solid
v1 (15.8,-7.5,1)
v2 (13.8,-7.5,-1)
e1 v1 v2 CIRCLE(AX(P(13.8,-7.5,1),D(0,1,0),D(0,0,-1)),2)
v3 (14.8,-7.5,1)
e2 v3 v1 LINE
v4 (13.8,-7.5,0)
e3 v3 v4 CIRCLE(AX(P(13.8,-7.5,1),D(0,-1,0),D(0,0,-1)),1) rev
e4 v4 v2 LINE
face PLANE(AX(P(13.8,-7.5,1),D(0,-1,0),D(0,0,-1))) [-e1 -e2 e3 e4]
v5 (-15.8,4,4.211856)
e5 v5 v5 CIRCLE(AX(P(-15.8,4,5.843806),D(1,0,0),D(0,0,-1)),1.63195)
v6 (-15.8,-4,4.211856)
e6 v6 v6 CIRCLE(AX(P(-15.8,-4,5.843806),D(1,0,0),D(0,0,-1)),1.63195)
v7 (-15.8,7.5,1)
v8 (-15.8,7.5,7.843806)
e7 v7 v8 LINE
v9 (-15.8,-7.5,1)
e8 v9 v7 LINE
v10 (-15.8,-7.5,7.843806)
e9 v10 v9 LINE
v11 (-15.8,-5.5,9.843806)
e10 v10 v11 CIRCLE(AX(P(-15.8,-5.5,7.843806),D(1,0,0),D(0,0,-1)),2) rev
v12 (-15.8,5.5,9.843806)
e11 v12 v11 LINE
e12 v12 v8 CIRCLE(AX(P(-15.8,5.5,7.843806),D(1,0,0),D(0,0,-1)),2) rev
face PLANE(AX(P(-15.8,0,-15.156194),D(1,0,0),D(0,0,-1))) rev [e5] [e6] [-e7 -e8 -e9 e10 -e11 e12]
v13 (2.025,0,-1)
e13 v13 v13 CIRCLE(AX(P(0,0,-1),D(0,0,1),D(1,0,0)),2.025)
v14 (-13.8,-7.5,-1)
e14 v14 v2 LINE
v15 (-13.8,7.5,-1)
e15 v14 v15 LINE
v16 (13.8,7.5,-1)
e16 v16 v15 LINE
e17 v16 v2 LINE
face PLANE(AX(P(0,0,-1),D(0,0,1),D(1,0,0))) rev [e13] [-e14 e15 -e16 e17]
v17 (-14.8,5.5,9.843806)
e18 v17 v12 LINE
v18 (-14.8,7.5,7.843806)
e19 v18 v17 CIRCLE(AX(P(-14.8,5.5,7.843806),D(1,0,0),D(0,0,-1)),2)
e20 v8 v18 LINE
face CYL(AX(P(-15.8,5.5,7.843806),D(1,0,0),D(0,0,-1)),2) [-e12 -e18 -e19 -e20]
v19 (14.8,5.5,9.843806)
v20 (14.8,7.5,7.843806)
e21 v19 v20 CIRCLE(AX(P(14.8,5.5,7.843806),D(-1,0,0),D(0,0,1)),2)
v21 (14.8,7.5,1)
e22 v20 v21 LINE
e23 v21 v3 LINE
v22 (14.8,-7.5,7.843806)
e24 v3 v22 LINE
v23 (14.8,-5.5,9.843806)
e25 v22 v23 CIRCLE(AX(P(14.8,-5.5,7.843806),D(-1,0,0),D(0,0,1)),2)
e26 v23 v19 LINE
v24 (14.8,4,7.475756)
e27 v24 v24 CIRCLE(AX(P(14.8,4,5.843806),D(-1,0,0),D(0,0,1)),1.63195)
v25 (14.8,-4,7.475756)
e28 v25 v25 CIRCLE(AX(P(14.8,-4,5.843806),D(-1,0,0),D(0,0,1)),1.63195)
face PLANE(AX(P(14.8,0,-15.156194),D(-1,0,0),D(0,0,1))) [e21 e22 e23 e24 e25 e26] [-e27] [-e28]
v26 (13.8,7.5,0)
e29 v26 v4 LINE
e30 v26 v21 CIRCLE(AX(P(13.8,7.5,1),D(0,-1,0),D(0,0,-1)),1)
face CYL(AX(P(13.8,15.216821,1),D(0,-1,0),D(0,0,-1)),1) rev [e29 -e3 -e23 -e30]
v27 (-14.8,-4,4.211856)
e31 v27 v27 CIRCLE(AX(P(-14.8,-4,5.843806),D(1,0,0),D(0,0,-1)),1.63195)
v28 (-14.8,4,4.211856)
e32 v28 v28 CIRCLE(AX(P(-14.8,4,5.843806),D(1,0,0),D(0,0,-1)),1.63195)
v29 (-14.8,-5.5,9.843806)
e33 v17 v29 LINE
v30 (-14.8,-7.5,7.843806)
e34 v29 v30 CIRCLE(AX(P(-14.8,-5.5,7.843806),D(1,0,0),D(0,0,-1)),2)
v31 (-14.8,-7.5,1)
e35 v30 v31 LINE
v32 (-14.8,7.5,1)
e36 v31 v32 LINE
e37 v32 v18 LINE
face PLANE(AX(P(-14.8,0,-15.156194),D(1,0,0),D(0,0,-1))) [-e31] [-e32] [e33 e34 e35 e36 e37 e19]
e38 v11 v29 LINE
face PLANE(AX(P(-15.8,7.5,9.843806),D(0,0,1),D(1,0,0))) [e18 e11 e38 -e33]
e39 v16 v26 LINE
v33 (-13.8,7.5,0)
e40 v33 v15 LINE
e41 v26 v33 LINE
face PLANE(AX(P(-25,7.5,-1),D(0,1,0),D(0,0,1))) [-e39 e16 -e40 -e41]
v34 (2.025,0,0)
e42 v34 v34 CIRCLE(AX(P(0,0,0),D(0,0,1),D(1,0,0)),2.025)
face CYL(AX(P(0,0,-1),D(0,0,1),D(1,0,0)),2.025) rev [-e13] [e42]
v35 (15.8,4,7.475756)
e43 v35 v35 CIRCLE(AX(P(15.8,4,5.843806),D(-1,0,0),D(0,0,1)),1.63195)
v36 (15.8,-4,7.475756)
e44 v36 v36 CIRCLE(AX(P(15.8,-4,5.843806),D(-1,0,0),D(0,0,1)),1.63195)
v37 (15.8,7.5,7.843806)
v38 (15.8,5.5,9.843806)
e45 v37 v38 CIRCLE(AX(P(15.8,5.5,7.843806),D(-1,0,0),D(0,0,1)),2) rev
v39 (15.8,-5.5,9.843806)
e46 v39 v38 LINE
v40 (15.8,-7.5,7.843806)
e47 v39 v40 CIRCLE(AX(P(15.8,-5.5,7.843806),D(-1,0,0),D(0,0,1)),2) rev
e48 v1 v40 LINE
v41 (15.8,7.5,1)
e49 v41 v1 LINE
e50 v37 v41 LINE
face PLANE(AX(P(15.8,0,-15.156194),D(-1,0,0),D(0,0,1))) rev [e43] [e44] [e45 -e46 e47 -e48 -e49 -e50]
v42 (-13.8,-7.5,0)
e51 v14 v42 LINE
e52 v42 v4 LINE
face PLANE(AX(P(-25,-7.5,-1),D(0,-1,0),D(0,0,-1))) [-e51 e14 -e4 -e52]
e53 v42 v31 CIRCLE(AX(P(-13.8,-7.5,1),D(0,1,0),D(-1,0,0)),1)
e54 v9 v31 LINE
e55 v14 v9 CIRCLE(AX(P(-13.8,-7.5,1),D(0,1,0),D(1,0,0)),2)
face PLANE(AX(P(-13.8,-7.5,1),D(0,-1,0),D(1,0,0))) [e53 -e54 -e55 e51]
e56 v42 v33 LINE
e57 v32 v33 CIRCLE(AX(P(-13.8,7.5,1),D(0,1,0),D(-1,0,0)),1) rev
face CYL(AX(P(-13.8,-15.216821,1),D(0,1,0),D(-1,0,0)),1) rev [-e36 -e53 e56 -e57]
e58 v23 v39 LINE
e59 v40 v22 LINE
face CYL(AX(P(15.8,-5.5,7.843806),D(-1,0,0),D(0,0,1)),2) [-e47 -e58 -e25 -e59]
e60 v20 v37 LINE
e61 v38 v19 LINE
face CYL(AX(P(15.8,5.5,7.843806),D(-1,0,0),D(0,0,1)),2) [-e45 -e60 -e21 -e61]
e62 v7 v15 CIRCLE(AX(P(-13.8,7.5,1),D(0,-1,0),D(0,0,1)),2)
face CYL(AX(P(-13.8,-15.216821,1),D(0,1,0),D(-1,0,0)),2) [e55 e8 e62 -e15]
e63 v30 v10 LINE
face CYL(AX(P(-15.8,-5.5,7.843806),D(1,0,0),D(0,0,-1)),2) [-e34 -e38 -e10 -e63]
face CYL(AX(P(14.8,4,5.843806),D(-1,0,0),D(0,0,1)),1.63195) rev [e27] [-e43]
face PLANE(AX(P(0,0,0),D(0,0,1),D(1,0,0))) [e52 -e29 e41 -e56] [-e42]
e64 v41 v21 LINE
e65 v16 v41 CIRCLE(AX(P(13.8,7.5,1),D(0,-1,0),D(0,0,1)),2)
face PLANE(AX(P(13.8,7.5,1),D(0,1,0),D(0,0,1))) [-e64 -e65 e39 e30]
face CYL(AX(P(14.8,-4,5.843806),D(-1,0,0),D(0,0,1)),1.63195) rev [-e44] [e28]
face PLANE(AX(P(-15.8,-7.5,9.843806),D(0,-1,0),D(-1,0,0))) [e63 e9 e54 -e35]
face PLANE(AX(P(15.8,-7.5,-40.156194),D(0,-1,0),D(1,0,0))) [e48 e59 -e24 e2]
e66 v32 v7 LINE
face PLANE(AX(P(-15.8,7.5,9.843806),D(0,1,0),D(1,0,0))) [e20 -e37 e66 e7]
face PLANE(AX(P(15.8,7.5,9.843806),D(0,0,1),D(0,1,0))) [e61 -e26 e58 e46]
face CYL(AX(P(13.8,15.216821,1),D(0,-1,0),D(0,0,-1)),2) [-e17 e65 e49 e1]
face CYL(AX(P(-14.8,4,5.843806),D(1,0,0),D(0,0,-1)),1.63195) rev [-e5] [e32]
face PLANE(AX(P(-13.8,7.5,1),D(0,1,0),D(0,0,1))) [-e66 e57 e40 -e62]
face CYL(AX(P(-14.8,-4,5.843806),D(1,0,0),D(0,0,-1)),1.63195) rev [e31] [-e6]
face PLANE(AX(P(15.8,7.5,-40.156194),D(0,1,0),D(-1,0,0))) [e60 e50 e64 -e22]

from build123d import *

# Parameters (mm, degrees)
SKETCH1_W                  = 50
SKETCH1_H                  = 15
SKETCH1_R                  = 2.025
BASE_FLANGE1_DEPTH         = 1
F_4_CLEARANCE_HOLE1_D      = 3.2639
SKETCHED_START             = -7.5
SKETCHED_BEND1_DEPTH       = 15
SKETCHED_START_2           = -2.3680499
SKETCHED_BEND1_2_DEPTH     = 4.7360998
SKETCHED_BEND1_3_DEPTH     = 1.8680499
SKETCHED_START_3           = 5.6319501
SKETCHED_BEND1_4_DEPTH     = 1.8680499
SKETCHED_START_4           = -5.6319501
SKETCHED_BEND1_5_DEPTH     = 11.2639002
SKETCHED_START_5           = -15.8
SKETCHED_BEND1_6_OUTLINE_R = 1.63195
SKETCHED_BEND1_6_DEPTH     = 31.6
FILLET1_R                  = 2


with BuildPart() as part:
    # Base-Flange1: sheet metal written as solids
    # Sketch1 → Base-Flange1 (new body)
    with BuildSketch(Plane.XY):
        Rectangle(SKETCH1_W, SKETCH1_H)
        Circle(SKETCH1_R, mode=Mode.SUBTRACT)
    extrude(amount=-BASE_FLANGE1_DEPTH)

    # #4 Clearance Hole1 (through all)
    with Locations(Plane.XY):
        with Locations((-21, 4), (-21, -4), (21, 4), (21, -4)):
            Hole(F_4_CLEARANCE_HOLE1_D / 2)

    # Sketched Bend1: read off the stored shape, not the designer's step
    # Sketched Bend1 outline → Sketched Bend1 (cut)
    with BuildSketch(Plane(origin=(0, 0, 0), x_dir=(1, 0, 0), z_dir=(0, 1, 0)).offset(SKETCHED_START)):
        with BuildLine():
            ThreePointArc((-15.532050807, 0), (-14.8, 0.732050807), (-13.8, 1))
            Line((-13.8, 1), (-25, 1))
            Line((-25, 1), (-25, 0))
            Line((-25, 0), (-15.532050807, 0))
        make_face()
        with BuildLine():
            Line((25, 1), (13.8, 1))
            ThreePointArc((13.8, 1), (14.8, 0.732050807), (15.532050807, 0))
            Line((15.532050807, 0), (25, 0))
            Line((25, 0), (25, 1))
        make_face()
    extrude(amount=SKETCHED_BEND1_DEPTH, mode=Mode.SUBTRACT)

    # Sketched Bend1 2 outline → Sketched Bend1 2 (add)
    with BuildSketch(Plane(origin=(0, 0, 0), x_dir=(1, 0, 0), z_dir=(0, 1, 0)).offset(SKETCHED_START_2)):
        with BuildLine():
            Line((-13.8, 0), (-15.532050807, 0))
            ThreePointArc((-15.532050807, 0), (-15.731851652, -0.48236191), (-15.8, -1))
            Line((-15.8, -1), (-15.8, -9.84380551))
            Line((-15.8, -9.84380551), (-14.8, -9.84380551))
            Line((-14.8, -9.84380551), (-14.8, -1))
            ThreePointArc((-14.8, -1), (-14.507106781, -0.292893219), (-13.8, 0))
        make_face()
        with BuildLine():
            ThreePointArc((15.8, -1), (15.731851652, -0.48236191), (15.532050807, 0))
            Line((15.532050807, 0), (13.8, 0))
            ThreePointArc((13.8, 0), (14.507106781, -0.292893219), (14.8, -1))
            Line((14.8, -1), (14.8, -9.84380551))
            Line((14.8, -9.84380551), (15.8, -9.84380551))
            Line((15.8, -9.84380551), (15.8, -1))
        make_face()
    extrude(amount=SKETCHED_BEND1_2_DEPTH)

    # Sketched Bend1 3 outline → Sketched Bend1 3 (add)
    with BuildSketch(Plane(origin=(0, 0, 0), x_dir=(1, 0, 0), z_dir=(0, 1, 0)).offset(SKETCHED_START)):
        with BuildLine():
            Line((-13.8, 0), (-15.532050807, 0))
            ThreePointArc((-15.532050807, 0), (-15.731851652, -0.48236191), (-15.8, -1))
            Line((-15.8, -1), (-15.8, -9.84380551))
            Line((-15.8, -9.84380551), (-14.8, -9.84380551))
            Line((-14.8, -9.84380551), (-14.8, -1))
            ThreePointArc((-14.8, -1), (-14.507106781, -0.292893219), (-13.8, 0))
        make_face()
        with BuildLine():
            ThreePointArc((15.8, -1), (15.731851652, -0.48236191), (15.532050807, 0))
            Line((15.532050807, 0), (13.8, 0))
            ThreePointArc((13.8, 0), (14.507106781, -0.292893219), (14.8, -1))
            Line((14.8, -1), (14.8, -9.84380551))
            Line((14.8, -9.84380551), (15.8, -9.84380551))
            Line((15.8, -9.84380551), (15.8, -1))
        make_face()
    extrude(amount=SKETCHED_BEND1_3_DEPTH)

    # Sketched Bend1 4 outline → Sketched Bend1 4 (add)
    with BuildSketch(Plane(origin=(0, 0, 0), x_dir=(1, 0, 0), z_dir=(0, 1, 0)).offset(SKETCHED_START_3)):
        with BuildLine():
            Line((-13.8, 0), (-15.532050807, 0))
            ThreePointArc((-15.532050807, 0), (-15.731851652, -0.48236191), (-15.8, -1))
            Line((-15.8, -1), (-15.8, -9.84380551))
            Line((-15.8, -9.84380551), (-14.8, -9.84380551))
            Line((-14.8, -9.84380551), (-14.8, -1))
            ThreePointArc((-14.8, -1), (-14.507106781, -0.292893219), (-13.8, 0))
        make_face()
        with BuildLine():
            ThreePointArc((15.8, -1), (15.731851652, -0.48236191), (15.532050807, 0))
            Line((15.532050807, 0), (13.8, 0))
            ThreePointArc((13.8, 0), (14.507106781, -0.292893219), (14.8, -1))
            Line((14.8, -1), (14.8, -9.84380551))
            Line((14.8, -9.84380551), (15.8, -9.84380551))
            Line((15.8, -9.84380551), (15.8, -1))
        make_face()
    extrude(amount=SKETCHED_BEND1_4_DEPTH)

    # Sketched Bend1 5 outline → Sketched Bend1 5 (add)
    with BuildSketch(Plane(origin=(0, 0, 0), x_dir=(1, 0, 0), z_dir=(0, 1, 0)).offset(SKETCHED_START_4)):
        with BuildLine():
            Line((-13.8, 0), (-15.532050807, 0))
            ThreePointArc((-15.532050807, 0), (-15.731851652, -0.48236191), (-15.8, -1))
            Line((-15.8, -1), (-15.8, -9.84380551))
            Line((-15.8, -9.84380551), (-14.8, -9.84380551))
            Line((-14.8, -9.84380551), (-14.8, -1))
            ThreePointArc((-14.8, -1), (-14.507106781, -0.292893219), (-13.8, 0))
        make_face()
        with BuildLine():
            Line((15.532050807, 0), (13.8, 0))
            ThreePointArc((13.8, 0), (14.507106781, -0.292893219), (14.8, -1))
            Line((14.8, -1), (14.8, -9.84380551))
            Line((14.8, -9.84380551), (15.8, -9.84380551))
            Line((15.8, -9.84380551), (15.8, -1))
            ThreePointArc((15.8, -1), (15.731851652, -0.48236191), (15.532050807, 0))
        make_face()
    extrude(amount=SKETCHED_BEND1_5_DEPTH)

    # Sketched Bend1 6 outline → Sketched Bend1 6 (cut)
    with BuildSketch(Plane.YZ.offset(SKETCHED_START_5)):
        with Locations((-4, 5.84380551)):
            Circle(SKETCHED_BEND1_6_OUTLINE_R)
        with Locations((4, 5.84380551)):
            Circle(SKETCHED_BEND1_6_OUTLINE_R)
    extrude(amount=SKETCHED_BEND1_6_DEPTH, mode=Mode.SUBTRACT)

    # Fillet1
    fillet1_edges = [part.edges().sort_by_distance(p)[0] for p in [
        (15.3, 7.5, 9.84380551),
        (15.3, -7.5, 9.84380551),
        (-15.3, -7.5, 9.84380551),
        (-15.3, 7.5, 9.84380551),
    ]]
    fillet(fillet1_edges, radius=FILLET1_R)


solid = part.part
